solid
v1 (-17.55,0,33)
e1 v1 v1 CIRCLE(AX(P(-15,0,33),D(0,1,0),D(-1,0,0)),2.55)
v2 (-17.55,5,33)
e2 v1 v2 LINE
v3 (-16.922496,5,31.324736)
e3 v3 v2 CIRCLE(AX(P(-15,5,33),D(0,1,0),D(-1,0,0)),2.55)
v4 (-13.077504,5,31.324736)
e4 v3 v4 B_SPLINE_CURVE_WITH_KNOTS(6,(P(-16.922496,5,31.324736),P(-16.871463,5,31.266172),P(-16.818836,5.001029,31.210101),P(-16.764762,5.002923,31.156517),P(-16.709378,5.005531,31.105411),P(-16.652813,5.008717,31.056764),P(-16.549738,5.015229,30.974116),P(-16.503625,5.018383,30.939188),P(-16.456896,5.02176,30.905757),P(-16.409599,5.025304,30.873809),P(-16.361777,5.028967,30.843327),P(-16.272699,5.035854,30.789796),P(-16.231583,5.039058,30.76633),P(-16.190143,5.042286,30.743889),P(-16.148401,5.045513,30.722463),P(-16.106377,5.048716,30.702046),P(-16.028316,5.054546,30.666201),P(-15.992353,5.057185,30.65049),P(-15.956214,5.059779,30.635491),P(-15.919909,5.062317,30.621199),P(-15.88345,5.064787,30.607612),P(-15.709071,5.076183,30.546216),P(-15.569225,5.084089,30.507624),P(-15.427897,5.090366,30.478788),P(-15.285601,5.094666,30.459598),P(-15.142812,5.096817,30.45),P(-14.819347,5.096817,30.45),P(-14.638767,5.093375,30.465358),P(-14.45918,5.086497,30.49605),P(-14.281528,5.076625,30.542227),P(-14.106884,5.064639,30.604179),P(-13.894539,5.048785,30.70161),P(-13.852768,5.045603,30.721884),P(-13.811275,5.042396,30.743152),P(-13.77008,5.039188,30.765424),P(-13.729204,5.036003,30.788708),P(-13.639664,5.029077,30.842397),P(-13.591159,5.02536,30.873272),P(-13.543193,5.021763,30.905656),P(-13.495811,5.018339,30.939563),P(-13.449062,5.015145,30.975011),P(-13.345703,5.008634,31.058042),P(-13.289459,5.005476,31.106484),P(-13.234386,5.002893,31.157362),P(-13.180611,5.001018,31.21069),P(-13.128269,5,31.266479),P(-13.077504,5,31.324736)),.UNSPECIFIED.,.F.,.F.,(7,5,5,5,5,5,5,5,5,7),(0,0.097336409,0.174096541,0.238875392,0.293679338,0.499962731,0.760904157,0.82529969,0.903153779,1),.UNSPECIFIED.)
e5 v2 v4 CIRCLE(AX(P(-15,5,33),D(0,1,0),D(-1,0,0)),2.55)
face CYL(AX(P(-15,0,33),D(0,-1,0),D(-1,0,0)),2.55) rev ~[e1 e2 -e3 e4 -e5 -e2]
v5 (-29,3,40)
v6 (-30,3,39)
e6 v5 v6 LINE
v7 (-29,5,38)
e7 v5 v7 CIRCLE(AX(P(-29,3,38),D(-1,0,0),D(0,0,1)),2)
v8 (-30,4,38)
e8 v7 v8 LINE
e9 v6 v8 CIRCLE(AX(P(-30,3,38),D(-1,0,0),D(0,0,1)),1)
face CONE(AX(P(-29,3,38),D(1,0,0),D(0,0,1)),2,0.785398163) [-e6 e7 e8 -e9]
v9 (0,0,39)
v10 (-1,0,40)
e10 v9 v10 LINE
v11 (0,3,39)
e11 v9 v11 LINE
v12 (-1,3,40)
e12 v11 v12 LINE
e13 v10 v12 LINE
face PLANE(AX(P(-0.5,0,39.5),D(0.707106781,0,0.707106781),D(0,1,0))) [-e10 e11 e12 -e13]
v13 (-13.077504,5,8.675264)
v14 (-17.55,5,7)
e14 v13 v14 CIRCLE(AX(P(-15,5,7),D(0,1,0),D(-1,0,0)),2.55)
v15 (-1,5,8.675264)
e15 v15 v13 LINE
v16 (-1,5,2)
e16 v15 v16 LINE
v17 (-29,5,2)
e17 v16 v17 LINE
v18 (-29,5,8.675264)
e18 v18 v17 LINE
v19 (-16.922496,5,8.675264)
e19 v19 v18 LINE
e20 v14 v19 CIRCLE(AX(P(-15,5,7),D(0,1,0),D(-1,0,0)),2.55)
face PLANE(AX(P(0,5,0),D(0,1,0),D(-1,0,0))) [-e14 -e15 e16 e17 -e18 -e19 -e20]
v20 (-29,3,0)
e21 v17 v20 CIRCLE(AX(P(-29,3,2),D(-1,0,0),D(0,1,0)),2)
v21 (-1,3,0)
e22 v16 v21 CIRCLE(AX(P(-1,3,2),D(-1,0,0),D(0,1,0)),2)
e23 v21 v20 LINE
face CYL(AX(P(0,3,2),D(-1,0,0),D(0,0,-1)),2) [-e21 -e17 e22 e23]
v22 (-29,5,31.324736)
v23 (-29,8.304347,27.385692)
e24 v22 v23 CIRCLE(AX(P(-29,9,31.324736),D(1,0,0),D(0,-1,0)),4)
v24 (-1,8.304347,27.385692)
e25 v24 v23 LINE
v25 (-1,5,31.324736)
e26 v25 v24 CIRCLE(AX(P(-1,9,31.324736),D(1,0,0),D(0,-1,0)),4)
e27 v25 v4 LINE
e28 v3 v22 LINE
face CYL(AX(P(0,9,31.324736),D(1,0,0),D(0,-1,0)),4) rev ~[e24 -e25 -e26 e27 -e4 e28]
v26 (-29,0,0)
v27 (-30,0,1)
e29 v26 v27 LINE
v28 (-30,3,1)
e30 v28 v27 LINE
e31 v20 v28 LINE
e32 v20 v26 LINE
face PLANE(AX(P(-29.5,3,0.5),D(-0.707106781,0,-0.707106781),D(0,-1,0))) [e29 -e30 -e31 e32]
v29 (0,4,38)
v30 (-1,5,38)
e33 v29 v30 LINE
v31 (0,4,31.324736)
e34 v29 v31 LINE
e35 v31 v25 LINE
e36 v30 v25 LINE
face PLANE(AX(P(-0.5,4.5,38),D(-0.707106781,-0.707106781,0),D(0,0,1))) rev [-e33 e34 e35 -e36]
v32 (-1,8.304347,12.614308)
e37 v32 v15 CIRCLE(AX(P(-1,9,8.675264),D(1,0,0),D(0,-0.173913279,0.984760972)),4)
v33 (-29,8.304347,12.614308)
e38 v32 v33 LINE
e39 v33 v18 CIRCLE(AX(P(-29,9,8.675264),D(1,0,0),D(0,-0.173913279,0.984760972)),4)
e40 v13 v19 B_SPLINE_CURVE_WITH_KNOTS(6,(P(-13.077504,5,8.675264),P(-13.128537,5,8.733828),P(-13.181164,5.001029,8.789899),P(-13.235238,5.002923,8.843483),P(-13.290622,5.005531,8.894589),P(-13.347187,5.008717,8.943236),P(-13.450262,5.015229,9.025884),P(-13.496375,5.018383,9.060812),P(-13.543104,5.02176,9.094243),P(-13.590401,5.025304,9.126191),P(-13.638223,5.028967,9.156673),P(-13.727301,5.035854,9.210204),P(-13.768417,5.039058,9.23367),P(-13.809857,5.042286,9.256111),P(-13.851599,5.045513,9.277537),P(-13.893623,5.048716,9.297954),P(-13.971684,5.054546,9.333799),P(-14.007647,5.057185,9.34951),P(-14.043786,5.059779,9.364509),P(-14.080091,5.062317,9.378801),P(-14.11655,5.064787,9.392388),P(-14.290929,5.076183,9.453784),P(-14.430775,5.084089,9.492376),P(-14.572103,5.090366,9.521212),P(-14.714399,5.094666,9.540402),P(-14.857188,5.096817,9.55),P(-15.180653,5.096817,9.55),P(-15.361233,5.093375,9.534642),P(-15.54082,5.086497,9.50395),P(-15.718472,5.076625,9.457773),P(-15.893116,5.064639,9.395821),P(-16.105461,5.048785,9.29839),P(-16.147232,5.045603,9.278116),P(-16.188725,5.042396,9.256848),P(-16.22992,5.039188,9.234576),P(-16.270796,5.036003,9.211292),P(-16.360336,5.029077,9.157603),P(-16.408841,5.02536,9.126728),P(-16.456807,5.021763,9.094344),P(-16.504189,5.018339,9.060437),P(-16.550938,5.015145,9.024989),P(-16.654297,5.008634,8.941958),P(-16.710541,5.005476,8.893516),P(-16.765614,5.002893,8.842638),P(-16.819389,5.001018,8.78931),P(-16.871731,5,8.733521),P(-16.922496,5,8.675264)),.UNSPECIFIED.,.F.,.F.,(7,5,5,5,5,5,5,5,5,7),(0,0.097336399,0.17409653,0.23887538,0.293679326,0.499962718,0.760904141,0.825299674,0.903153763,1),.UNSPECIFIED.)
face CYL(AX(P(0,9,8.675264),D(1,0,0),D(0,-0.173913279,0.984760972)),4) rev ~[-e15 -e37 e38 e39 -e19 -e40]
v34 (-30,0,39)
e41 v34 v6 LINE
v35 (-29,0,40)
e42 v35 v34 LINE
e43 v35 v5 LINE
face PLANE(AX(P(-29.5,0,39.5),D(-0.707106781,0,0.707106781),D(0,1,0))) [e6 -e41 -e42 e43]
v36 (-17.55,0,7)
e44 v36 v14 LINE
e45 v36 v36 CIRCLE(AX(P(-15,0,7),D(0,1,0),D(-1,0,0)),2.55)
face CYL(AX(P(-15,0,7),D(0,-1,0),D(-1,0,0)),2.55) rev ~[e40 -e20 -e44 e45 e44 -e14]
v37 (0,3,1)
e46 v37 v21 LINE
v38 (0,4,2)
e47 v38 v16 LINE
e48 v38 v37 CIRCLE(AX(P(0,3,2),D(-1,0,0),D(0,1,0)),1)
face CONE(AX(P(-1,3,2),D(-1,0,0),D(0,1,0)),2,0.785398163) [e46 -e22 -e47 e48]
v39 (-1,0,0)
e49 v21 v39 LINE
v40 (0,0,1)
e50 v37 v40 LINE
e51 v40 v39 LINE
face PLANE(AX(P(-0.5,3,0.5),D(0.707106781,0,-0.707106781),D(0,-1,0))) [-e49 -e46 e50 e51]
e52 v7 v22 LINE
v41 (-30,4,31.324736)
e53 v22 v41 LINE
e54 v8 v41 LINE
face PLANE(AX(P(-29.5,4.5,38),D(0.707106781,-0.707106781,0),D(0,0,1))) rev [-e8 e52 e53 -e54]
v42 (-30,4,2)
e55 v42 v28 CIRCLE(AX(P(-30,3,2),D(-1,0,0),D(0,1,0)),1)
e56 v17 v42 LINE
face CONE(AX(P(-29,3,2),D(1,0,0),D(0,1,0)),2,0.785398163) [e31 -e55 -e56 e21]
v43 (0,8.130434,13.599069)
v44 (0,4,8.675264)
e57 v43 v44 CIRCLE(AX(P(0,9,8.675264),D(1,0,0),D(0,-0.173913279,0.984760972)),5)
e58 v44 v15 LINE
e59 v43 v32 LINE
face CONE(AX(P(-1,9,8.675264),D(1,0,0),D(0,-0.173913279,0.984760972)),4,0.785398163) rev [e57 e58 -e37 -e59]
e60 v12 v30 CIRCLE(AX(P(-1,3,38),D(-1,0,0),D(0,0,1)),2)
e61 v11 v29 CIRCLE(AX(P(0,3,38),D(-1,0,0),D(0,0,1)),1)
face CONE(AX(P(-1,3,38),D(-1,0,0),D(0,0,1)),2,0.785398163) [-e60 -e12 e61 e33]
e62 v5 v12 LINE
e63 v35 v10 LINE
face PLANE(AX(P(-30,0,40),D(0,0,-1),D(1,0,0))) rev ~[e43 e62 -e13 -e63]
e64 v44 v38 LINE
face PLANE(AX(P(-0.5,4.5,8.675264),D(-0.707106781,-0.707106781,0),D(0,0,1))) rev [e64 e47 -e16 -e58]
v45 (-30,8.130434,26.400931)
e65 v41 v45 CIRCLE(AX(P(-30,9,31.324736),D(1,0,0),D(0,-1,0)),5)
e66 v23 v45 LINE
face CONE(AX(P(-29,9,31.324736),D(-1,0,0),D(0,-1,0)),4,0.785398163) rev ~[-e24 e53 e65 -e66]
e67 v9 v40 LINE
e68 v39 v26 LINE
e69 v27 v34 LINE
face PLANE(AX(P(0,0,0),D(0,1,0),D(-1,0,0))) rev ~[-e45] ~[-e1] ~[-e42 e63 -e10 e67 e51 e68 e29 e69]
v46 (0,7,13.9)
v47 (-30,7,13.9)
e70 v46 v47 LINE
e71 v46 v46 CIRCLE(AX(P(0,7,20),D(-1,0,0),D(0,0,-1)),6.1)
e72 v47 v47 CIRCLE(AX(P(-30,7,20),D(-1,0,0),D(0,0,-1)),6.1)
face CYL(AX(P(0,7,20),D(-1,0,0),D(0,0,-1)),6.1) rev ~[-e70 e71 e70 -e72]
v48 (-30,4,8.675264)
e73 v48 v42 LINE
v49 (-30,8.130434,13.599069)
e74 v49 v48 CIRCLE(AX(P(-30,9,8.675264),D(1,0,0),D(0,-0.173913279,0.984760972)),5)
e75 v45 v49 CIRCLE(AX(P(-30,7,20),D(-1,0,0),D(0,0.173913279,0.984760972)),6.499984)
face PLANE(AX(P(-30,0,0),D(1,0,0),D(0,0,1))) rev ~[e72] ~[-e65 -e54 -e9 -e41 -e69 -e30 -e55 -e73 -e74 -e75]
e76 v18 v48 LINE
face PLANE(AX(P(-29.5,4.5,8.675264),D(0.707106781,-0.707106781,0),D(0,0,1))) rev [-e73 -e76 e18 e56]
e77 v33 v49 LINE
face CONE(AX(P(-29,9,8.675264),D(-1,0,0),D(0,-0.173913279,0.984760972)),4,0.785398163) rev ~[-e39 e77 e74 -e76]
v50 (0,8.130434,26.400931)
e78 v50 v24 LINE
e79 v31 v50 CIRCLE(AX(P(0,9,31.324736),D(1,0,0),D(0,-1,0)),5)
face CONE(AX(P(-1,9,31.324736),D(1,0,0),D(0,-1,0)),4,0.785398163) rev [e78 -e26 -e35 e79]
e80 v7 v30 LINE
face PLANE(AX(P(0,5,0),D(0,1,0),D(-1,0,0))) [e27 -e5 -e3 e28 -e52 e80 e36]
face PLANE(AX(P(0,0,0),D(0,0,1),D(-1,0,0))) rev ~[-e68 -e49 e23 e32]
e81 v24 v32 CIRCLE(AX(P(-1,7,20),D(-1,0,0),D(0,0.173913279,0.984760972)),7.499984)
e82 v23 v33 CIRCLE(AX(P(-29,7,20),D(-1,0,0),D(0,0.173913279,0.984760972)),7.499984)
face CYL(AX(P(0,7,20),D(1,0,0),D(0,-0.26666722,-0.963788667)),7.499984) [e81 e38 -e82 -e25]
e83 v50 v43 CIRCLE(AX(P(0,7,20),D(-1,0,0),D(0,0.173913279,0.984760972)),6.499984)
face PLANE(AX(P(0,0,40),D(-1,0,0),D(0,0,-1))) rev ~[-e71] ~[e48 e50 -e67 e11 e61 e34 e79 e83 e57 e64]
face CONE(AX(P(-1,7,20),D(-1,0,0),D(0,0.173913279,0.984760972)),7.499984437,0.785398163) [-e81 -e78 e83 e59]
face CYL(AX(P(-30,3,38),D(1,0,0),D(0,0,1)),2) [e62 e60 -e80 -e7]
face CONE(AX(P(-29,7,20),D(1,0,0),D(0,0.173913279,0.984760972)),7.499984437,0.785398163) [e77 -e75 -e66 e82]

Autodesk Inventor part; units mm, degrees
ref_plane "YZ Plane" through (0, 0, 0) normal (1, 0, 0) x (0, 1, 0)
ref_plane "XZ Plane" through (0, 0, 0) normal (0, 1, 0) x (-1, 0, 0)
ref_plane "XY Plane" through (0, 0, 0) normal (0, 0, 1) x (1, 0, 0)
sketch "Skizze1" plane through (0, 0, 0) normal (0, 1, 0) x (-1, 0, 0)
  line L0 (0, 0) -> (30, 0)
  line L1 (30, 0) -> (30, 40)
  line L2 (30, 40) -> (0, 40)
  line L3 (0, 40) -> (0, 0)
  circle A0 centre (15, 33) radius 2.55
  circle A1 centre (15, 7) radius 2.55
  dimension "d0" = 30
  dimension "d1" = 40
  dimension "d2" = 5.1
  dimension "d3" = 5.1
  dimension "d4" = 7
  dimension "d5" = 7
  dimension "d6" = 15
  dimension "d7" = 15
extrude "Baseplate" add sketch "Skizze1" along normal blind 5
sketch "Skizze2" plane through (0, 0, 40) normal (1, 0, 0) x (0, 0, -1)
  arc A0 (27.2284, 5) -> (12.7716, 5) centre (20, 7) ccw
  line L0 (40, 0) -> (40, 5) projected
  line L1 (0, 5) -> (40, 5) projected
  line L2 (12.7716, 5) -> (27.2284, 5)
  line L3 (40, 5) -> (0, 5) projected
  dimension "d10" = 15
  dimension "d12" = 20
  dimension "d13" = 2
extrude "Rounding" add sketch "Skizze2" against normal up to surface (30 mm away)
sketch "Skizze3" plane through (0, 0, 40) normal (1, 0, 0) x (0, 0, -1)
  line L0 (40, 0) -> (40, 5) projected
  line L1 (27.2284, 5) -> (40, 5) projected
  circle A0 centre (20, 7) radius 4.05
  dimension "d17" = 20
  dimension "d18" = 2
  dimension "d19" = 8.1
hole "Sensor" at (0, 7, 20) direction (-1, 0, 0) diameter 12.2 end through all
fillet "Rundung1" radius 4 2 edges at (-15, 5, 27.2284) (-15, 5, 12.7716)
fillet "Rundung2" radius 2 2 edges at (-15, 5, 0) (-15, 5, 40)
chamfer "Fase1" distance 1 angle 45 18 edges at (0, 1.5, 40) (0, 4.4142, 39.4142) (0, 5, 34.6624) (0, 5.9355, 28.754) (0, 5.9355, 11.246) (0, 14.5, 20) (0, 5, 5.3376) (0, 4.4142, 0.5858) (0, 1.5, 0) (-30, 5.9355, 28.754) (-30, 5.9355, 11.246) (-30, 14.5, 20) (-30, 5, 34.6624) (-30, 4.4142, 39.4142) (-30, 1.5, 40) (-30, 5, 5.3376) (-30, 4.4142, 0.5858) (-30, 1.5, 0)
equation "\"d3\" = d2"
equation "\"d5\" = d4"
properties part number "Prox_Z_3030"
